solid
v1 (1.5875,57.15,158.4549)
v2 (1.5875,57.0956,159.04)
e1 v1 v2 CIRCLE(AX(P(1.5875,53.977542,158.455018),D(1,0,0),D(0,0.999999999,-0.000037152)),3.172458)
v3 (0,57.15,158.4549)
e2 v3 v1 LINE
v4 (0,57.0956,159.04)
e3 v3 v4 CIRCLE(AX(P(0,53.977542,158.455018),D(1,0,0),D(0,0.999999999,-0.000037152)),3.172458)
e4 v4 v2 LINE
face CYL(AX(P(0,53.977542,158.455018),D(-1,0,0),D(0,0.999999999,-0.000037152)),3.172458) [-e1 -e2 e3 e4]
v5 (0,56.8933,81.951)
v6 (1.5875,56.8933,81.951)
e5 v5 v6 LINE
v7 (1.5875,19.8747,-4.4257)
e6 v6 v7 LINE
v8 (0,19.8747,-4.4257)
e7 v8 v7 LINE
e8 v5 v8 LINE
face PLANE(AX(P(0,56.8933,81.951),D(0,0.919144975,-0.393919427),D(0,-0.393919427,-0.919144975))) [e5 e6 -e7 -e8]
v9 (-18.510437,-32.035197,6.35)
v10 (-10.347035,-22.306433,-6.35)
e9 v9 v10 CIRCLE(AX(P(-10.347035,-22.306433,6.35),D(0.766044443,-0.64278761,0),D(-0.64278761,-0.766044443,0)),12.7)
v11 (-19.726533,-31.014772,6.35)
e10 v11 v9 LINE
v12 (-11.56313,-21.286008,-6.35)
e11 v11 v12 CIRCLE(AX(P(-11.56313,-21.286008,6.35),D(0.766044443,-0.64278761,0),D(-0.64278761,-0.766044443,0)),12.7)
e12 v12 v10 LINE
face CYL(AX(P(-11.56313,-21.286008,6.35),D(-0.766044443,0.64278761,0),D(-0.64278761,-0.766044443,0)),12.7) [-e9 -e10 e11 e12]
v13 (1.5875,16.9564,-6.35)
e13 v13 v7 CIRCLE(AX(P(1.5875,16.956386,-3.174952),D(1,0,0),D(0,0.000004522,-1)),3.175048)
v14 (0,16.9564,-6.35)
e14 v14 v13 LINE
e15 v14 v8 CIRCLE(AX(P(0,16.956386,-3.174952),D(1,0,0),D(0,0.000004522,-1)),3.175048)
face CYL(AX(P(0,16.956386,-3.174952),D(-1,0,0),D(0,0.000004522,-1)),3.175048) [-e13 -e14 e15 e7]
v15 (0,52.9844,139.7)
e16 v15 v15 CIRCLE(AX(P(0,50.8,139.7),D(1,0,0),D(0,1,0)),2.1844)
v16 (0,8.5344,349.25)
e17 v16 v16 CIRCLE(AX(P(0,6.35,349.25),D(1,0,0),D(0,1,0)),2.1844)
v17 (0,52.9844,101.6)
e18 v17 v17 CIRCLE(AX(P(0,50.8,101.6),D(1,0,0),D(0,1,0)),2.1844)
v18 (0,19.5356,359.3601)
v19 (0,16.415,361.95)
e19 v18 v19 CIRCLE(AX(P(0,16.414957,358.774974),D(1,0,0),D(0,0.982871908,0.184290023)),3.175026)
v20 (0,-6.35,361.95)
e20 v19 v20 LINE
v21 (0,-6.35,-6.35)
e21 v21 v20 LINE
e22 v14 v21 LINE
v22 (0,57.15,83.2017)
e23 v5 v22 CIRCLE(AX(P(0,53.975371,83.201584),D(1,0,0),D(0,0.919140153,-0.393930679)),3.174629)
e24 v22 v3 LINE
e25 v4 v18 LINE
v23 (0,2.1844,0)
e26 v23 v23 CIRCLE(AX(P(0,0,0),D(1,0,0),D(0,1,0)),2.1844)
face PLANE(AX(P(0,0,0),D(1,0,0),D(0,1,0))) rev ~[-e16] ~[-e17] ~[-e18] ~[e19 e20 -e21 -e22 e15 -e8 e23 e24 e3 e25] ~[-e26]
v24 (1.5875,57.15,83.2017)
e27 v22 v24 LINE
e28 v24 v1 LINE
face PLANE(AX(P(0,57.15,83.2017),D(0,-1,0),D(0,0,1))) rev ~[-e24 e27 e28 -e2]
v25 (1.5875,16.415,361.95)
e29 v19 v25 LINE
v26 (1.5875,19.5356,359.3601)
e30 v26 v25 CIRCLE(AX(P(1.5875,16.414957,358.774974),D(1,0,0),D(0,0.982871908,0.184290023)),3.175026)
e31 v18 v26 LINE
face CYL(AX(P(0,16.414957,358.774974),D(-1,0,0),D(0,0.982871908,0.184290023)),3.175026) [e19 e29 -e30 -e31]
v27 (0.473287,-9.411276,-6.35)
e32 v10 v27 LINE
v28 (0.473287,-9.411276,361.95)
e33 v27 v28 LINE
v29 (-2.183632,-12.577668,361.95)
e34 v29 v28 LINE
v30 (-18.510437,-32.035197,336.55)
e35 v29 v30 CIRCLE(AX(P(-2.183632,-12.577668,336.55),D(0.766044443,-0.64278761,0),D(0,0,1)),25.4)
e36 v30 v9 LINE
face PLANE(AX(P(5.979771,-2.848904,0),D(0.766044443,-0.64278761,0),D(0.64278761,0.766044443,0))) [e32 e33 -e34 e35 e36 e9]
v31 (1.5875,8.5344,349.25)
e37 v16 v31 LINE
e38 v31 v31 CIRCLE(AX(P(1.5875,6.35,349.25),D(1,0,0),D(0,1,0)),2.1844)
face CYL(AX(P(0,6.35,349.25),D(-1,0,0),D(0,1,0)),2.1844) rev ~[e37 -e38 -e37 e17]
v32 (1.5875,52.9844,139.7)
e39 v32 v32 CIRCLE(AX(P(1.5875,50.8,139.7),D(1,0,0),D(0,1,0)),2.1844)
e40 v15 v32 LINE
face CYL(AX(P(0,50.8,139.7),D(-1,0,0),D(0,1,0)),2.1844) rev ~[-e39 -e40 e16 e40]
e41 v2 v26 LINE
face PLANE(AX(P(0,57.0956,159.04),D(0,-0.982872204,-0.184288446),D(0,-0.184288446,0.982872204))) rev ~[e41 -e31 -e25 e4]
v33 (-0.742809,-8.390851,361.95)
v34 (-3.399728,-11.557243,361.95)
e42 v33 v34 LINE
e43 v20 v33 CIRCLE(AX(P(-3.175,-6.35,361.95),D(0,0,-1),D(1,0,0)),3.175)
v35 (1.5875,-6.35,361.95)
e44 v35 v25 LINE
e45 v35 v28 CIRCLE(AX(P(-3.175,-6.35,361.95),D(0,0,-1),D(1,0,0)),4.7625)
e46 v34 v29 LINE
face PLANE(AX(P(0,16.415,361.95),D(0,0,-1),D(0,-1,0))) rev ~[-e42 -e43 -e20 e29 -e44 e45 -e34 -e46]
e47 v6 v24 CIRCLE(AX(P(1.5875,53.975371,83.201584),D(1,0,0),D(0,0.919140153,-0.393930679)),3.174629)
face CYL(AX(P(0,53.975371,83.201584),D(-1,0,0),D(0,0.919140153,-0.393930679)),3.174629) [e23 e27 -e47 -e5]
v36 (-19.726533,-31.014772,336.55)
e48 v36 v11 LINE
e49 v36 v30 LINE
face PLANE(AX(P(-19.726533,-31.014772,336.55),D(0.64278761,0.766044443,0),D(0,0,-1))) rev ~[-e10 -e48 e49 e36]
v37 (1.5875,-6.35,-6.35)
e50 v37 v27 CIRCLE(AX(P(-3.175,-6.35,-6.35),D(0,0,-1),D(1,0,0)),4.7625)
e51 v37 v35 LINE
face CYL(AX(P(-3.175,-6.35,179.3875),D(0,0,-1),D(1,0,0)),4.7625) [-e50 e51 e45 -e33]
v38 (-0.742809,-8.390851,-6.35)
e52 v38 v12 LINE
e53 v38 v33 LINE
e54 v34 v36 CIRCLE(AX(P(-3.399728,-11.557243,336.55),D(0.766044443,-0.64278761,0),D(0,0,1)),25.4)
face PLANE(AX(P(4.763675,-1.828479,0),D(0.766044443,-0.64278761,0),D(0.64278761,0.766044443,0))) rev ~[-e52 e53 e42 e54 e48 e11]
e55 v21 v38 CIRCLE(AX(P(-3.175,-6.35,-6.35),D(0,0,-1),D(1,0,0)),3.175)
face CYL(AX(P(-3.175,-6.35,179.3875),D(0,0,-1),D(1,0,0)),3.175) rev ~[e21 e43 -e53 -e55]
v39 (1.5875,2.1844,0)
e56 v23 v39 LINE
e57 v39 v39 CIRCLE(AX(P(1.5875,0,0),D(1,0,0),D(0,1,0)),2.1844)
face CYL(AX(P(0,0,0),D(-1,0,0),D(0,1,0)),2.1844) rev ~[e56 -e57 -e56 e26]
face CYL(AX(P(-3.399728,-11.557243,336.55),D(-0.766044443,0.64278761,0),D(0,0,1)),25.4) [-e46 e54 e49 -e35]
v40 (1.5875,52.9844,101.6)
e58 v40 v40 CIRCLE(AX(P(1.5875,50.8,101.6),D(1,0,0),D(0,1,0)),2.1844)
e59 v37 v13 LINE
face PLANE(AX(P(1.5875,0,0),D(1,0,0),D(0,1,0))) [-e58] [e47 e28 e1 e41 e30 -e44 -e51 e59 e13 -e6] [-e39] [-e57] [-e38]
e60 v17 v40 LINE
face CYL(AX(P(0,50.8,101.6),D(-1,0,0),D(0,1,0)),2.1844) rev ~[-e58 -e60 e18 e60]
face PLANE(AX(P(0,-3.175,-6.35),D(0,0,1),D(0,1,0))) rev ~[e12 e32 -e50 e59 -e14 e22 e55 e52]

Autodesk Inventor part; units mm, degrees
ref_plane "YZ Plane" through (0, 0, 0) normal (1, 0, 0) x (0, 1, 0)
ref_plane "XZ Plane" through (0, 0, 0) normal (0, 1, 0) x (-1, 0, 0)
ref_plane "XY Plane" through (0, 0, 0) normal (0, 0, 1) x (1, 0, 0)
sketch "main" plane through (0, 0, 0) normal (0, 0, 1) x (1, 0, 0)
  circle A0 centre (51.9329, 240.4167) radius 2.1844
  line L0 (60.6642, 253.1167) -> (43.2017, 253.1167)
  arc A1 (32.8829, 253.1167) -> (7.4829, 227.7167) centre (32.8829, 227.7167) ccw
  line L1 (39.2329, 253.1167) -> (32.8829, 253.1167)
  line L2 (39.2329, 249.9417) -> (39.2329, 253.1167)
  line L3 (39.2329, 253.1167) -> (42.4079, 253.1167)
  line L4 (42.4079, 253.1167) -> (43.2017, 253.1167)
  arc A2 (65.1185, 250.5268) -> (61.9979, 253.1167) centre (61.9979, 249.9417) ccw
  line L5 (61.9979, 253.1167) -> (60.6642, 253.1167)
  line L6 (42.4079, -115.1833) -> (62.5393, -115.1833)
  arc A3 (7.4829, -102.4833) -> (20.1829, -115.1833) centre (20.1829, -102.4833) ccw
  line L7 (20.1829, -115.1833) -> (42.4079, -115.1833)
  arc A4 (62.5393, -115.1833) -> (65.4576, -113.259) centre (62.5393, -112.0083) ccw
  line L8 (39.2329, 249.9417) -> (39.2329, -115.1833)
  line L9 (102.4762, -26.8823) -> (65.4576, -113.259)
  line L10 (102.7329, -25.6316) -> (102.7329, 49.6216)
  line L11 (102.6786, 50.2068) -> (65.1185, 250.5268)
  line L12 (7.4829, 227.7167) -> (7.4829, -102.4833)
  arc A5 (102.7329, 49.6216) -> (102.6786, 50.2068) centre (99.5579, 49.6216) ccw
  circle A6 centre (96.3829, 30.8667) radius 2.1844
  circle A7 centre (96.3829, -7.2333) radius 2.1844
  arc A8 (102.4762, -26.8823) -> (102.7329, -25.6316) centre (99.5579, -25.6316) ccw
  circle A9 centre (45.5829, -108.8333) radius 2.1844
  point P0 (57.0821, 72.2396)
  point P1 (7.4829, 253.1167)
  point P2 (64.6329, -115.1833)
  point P3 (102.7329, -26.2833)
  dimension "d0" = 25.4
  dimension "d1" = 3.175
  dimension "d2" = 3.175
  dimension "d3" = 3.175
  dimension "d4" = 31.75
  dimension "d5" = 90
  dimension "d6" = 25.4
  dimension "d7" = 12.7
sketch "Sketch1" plane through (0, 0, 0) normal (1, 0, 0) x (0, 1, 0)
  circle A0 centre (6.35, 349.25) radius 2.1844
  line L0 (15.0812, 361.95) -> (-2.3813, 361.95)
  arc A1 (-12.7, 361.95) -> (-38.1, 336.55) centre (-12.7, 336.55) ccw
  line L1 (-6.35, 361.95) -> (-12.7, 361.95)
  line L2 (-6.35, 358.775) -> (-6.35, 361.95)
  line L3 (-6.35, 361.95) -> (-3.175, 361.95)
  line L4 (-3.175, 361.95) -> (-2.3813, 361.95)
  arc A2 (19.5356, 359.3601) -> (16.415, 361.95) centre (16.415, 358.775) ccw
  line L5 (16.415, 361.95) -> (15.0812, 361.95)
  line L6 (-3.175, -6.35) -> (16.9564, -6.35)
  arc A3 (-38.1, 6.35) -> (-25.4, -6.35) centre (-25.4, 6.35) ccw
  line L7 (-25.4, -6.35) -> (-3.175, -6.35)
  arc A4 (16.9564, -6.35) -> (19.8747, -4.4257) centre (16.9564, -3.175) ccw
  line L8 (-6.35, 358.775) -> (-6.35, -6.35)
  line L9 (56.8933, 81.951) -> (19.8747, -4.4257)
  line L10 (57.15, 83.2017) -> (57.15, 158.4549)
  line L11 (57.0956, 159.04) -> (19.5356, 359.3601)
  line L12 (-38.1, 336.55) -> (-38.1, 6.35)
  arc A5 (57.15, 158.4549) -> (57.0956, 159.04) centre (53.975, 158.4549) ccw
  circle A6 centre (50.8, 139.7) radius 2.1844
  circle A7 centre (50.8, 101.6) radius 2.1844
  arc A8 (56.8933, 81.951) -> (57.15, 83.2017) centre (53.975, 83.2017) ccw
  circle A9 centre (0, 0) radius 2.1844
extrude "Extrusion1" add sketch "Sketch1" along normal blind 1.5875
bend part "Bend Part1" radius 3.175 angle 40 line through (0, -6.35, 358.775) along (0, 0, -1) centre toward (-1, 0, 0) moving side (0, -1, 0) both sides no
properties part number "side_panel_mirrored" material "Acetal Resin, White"
